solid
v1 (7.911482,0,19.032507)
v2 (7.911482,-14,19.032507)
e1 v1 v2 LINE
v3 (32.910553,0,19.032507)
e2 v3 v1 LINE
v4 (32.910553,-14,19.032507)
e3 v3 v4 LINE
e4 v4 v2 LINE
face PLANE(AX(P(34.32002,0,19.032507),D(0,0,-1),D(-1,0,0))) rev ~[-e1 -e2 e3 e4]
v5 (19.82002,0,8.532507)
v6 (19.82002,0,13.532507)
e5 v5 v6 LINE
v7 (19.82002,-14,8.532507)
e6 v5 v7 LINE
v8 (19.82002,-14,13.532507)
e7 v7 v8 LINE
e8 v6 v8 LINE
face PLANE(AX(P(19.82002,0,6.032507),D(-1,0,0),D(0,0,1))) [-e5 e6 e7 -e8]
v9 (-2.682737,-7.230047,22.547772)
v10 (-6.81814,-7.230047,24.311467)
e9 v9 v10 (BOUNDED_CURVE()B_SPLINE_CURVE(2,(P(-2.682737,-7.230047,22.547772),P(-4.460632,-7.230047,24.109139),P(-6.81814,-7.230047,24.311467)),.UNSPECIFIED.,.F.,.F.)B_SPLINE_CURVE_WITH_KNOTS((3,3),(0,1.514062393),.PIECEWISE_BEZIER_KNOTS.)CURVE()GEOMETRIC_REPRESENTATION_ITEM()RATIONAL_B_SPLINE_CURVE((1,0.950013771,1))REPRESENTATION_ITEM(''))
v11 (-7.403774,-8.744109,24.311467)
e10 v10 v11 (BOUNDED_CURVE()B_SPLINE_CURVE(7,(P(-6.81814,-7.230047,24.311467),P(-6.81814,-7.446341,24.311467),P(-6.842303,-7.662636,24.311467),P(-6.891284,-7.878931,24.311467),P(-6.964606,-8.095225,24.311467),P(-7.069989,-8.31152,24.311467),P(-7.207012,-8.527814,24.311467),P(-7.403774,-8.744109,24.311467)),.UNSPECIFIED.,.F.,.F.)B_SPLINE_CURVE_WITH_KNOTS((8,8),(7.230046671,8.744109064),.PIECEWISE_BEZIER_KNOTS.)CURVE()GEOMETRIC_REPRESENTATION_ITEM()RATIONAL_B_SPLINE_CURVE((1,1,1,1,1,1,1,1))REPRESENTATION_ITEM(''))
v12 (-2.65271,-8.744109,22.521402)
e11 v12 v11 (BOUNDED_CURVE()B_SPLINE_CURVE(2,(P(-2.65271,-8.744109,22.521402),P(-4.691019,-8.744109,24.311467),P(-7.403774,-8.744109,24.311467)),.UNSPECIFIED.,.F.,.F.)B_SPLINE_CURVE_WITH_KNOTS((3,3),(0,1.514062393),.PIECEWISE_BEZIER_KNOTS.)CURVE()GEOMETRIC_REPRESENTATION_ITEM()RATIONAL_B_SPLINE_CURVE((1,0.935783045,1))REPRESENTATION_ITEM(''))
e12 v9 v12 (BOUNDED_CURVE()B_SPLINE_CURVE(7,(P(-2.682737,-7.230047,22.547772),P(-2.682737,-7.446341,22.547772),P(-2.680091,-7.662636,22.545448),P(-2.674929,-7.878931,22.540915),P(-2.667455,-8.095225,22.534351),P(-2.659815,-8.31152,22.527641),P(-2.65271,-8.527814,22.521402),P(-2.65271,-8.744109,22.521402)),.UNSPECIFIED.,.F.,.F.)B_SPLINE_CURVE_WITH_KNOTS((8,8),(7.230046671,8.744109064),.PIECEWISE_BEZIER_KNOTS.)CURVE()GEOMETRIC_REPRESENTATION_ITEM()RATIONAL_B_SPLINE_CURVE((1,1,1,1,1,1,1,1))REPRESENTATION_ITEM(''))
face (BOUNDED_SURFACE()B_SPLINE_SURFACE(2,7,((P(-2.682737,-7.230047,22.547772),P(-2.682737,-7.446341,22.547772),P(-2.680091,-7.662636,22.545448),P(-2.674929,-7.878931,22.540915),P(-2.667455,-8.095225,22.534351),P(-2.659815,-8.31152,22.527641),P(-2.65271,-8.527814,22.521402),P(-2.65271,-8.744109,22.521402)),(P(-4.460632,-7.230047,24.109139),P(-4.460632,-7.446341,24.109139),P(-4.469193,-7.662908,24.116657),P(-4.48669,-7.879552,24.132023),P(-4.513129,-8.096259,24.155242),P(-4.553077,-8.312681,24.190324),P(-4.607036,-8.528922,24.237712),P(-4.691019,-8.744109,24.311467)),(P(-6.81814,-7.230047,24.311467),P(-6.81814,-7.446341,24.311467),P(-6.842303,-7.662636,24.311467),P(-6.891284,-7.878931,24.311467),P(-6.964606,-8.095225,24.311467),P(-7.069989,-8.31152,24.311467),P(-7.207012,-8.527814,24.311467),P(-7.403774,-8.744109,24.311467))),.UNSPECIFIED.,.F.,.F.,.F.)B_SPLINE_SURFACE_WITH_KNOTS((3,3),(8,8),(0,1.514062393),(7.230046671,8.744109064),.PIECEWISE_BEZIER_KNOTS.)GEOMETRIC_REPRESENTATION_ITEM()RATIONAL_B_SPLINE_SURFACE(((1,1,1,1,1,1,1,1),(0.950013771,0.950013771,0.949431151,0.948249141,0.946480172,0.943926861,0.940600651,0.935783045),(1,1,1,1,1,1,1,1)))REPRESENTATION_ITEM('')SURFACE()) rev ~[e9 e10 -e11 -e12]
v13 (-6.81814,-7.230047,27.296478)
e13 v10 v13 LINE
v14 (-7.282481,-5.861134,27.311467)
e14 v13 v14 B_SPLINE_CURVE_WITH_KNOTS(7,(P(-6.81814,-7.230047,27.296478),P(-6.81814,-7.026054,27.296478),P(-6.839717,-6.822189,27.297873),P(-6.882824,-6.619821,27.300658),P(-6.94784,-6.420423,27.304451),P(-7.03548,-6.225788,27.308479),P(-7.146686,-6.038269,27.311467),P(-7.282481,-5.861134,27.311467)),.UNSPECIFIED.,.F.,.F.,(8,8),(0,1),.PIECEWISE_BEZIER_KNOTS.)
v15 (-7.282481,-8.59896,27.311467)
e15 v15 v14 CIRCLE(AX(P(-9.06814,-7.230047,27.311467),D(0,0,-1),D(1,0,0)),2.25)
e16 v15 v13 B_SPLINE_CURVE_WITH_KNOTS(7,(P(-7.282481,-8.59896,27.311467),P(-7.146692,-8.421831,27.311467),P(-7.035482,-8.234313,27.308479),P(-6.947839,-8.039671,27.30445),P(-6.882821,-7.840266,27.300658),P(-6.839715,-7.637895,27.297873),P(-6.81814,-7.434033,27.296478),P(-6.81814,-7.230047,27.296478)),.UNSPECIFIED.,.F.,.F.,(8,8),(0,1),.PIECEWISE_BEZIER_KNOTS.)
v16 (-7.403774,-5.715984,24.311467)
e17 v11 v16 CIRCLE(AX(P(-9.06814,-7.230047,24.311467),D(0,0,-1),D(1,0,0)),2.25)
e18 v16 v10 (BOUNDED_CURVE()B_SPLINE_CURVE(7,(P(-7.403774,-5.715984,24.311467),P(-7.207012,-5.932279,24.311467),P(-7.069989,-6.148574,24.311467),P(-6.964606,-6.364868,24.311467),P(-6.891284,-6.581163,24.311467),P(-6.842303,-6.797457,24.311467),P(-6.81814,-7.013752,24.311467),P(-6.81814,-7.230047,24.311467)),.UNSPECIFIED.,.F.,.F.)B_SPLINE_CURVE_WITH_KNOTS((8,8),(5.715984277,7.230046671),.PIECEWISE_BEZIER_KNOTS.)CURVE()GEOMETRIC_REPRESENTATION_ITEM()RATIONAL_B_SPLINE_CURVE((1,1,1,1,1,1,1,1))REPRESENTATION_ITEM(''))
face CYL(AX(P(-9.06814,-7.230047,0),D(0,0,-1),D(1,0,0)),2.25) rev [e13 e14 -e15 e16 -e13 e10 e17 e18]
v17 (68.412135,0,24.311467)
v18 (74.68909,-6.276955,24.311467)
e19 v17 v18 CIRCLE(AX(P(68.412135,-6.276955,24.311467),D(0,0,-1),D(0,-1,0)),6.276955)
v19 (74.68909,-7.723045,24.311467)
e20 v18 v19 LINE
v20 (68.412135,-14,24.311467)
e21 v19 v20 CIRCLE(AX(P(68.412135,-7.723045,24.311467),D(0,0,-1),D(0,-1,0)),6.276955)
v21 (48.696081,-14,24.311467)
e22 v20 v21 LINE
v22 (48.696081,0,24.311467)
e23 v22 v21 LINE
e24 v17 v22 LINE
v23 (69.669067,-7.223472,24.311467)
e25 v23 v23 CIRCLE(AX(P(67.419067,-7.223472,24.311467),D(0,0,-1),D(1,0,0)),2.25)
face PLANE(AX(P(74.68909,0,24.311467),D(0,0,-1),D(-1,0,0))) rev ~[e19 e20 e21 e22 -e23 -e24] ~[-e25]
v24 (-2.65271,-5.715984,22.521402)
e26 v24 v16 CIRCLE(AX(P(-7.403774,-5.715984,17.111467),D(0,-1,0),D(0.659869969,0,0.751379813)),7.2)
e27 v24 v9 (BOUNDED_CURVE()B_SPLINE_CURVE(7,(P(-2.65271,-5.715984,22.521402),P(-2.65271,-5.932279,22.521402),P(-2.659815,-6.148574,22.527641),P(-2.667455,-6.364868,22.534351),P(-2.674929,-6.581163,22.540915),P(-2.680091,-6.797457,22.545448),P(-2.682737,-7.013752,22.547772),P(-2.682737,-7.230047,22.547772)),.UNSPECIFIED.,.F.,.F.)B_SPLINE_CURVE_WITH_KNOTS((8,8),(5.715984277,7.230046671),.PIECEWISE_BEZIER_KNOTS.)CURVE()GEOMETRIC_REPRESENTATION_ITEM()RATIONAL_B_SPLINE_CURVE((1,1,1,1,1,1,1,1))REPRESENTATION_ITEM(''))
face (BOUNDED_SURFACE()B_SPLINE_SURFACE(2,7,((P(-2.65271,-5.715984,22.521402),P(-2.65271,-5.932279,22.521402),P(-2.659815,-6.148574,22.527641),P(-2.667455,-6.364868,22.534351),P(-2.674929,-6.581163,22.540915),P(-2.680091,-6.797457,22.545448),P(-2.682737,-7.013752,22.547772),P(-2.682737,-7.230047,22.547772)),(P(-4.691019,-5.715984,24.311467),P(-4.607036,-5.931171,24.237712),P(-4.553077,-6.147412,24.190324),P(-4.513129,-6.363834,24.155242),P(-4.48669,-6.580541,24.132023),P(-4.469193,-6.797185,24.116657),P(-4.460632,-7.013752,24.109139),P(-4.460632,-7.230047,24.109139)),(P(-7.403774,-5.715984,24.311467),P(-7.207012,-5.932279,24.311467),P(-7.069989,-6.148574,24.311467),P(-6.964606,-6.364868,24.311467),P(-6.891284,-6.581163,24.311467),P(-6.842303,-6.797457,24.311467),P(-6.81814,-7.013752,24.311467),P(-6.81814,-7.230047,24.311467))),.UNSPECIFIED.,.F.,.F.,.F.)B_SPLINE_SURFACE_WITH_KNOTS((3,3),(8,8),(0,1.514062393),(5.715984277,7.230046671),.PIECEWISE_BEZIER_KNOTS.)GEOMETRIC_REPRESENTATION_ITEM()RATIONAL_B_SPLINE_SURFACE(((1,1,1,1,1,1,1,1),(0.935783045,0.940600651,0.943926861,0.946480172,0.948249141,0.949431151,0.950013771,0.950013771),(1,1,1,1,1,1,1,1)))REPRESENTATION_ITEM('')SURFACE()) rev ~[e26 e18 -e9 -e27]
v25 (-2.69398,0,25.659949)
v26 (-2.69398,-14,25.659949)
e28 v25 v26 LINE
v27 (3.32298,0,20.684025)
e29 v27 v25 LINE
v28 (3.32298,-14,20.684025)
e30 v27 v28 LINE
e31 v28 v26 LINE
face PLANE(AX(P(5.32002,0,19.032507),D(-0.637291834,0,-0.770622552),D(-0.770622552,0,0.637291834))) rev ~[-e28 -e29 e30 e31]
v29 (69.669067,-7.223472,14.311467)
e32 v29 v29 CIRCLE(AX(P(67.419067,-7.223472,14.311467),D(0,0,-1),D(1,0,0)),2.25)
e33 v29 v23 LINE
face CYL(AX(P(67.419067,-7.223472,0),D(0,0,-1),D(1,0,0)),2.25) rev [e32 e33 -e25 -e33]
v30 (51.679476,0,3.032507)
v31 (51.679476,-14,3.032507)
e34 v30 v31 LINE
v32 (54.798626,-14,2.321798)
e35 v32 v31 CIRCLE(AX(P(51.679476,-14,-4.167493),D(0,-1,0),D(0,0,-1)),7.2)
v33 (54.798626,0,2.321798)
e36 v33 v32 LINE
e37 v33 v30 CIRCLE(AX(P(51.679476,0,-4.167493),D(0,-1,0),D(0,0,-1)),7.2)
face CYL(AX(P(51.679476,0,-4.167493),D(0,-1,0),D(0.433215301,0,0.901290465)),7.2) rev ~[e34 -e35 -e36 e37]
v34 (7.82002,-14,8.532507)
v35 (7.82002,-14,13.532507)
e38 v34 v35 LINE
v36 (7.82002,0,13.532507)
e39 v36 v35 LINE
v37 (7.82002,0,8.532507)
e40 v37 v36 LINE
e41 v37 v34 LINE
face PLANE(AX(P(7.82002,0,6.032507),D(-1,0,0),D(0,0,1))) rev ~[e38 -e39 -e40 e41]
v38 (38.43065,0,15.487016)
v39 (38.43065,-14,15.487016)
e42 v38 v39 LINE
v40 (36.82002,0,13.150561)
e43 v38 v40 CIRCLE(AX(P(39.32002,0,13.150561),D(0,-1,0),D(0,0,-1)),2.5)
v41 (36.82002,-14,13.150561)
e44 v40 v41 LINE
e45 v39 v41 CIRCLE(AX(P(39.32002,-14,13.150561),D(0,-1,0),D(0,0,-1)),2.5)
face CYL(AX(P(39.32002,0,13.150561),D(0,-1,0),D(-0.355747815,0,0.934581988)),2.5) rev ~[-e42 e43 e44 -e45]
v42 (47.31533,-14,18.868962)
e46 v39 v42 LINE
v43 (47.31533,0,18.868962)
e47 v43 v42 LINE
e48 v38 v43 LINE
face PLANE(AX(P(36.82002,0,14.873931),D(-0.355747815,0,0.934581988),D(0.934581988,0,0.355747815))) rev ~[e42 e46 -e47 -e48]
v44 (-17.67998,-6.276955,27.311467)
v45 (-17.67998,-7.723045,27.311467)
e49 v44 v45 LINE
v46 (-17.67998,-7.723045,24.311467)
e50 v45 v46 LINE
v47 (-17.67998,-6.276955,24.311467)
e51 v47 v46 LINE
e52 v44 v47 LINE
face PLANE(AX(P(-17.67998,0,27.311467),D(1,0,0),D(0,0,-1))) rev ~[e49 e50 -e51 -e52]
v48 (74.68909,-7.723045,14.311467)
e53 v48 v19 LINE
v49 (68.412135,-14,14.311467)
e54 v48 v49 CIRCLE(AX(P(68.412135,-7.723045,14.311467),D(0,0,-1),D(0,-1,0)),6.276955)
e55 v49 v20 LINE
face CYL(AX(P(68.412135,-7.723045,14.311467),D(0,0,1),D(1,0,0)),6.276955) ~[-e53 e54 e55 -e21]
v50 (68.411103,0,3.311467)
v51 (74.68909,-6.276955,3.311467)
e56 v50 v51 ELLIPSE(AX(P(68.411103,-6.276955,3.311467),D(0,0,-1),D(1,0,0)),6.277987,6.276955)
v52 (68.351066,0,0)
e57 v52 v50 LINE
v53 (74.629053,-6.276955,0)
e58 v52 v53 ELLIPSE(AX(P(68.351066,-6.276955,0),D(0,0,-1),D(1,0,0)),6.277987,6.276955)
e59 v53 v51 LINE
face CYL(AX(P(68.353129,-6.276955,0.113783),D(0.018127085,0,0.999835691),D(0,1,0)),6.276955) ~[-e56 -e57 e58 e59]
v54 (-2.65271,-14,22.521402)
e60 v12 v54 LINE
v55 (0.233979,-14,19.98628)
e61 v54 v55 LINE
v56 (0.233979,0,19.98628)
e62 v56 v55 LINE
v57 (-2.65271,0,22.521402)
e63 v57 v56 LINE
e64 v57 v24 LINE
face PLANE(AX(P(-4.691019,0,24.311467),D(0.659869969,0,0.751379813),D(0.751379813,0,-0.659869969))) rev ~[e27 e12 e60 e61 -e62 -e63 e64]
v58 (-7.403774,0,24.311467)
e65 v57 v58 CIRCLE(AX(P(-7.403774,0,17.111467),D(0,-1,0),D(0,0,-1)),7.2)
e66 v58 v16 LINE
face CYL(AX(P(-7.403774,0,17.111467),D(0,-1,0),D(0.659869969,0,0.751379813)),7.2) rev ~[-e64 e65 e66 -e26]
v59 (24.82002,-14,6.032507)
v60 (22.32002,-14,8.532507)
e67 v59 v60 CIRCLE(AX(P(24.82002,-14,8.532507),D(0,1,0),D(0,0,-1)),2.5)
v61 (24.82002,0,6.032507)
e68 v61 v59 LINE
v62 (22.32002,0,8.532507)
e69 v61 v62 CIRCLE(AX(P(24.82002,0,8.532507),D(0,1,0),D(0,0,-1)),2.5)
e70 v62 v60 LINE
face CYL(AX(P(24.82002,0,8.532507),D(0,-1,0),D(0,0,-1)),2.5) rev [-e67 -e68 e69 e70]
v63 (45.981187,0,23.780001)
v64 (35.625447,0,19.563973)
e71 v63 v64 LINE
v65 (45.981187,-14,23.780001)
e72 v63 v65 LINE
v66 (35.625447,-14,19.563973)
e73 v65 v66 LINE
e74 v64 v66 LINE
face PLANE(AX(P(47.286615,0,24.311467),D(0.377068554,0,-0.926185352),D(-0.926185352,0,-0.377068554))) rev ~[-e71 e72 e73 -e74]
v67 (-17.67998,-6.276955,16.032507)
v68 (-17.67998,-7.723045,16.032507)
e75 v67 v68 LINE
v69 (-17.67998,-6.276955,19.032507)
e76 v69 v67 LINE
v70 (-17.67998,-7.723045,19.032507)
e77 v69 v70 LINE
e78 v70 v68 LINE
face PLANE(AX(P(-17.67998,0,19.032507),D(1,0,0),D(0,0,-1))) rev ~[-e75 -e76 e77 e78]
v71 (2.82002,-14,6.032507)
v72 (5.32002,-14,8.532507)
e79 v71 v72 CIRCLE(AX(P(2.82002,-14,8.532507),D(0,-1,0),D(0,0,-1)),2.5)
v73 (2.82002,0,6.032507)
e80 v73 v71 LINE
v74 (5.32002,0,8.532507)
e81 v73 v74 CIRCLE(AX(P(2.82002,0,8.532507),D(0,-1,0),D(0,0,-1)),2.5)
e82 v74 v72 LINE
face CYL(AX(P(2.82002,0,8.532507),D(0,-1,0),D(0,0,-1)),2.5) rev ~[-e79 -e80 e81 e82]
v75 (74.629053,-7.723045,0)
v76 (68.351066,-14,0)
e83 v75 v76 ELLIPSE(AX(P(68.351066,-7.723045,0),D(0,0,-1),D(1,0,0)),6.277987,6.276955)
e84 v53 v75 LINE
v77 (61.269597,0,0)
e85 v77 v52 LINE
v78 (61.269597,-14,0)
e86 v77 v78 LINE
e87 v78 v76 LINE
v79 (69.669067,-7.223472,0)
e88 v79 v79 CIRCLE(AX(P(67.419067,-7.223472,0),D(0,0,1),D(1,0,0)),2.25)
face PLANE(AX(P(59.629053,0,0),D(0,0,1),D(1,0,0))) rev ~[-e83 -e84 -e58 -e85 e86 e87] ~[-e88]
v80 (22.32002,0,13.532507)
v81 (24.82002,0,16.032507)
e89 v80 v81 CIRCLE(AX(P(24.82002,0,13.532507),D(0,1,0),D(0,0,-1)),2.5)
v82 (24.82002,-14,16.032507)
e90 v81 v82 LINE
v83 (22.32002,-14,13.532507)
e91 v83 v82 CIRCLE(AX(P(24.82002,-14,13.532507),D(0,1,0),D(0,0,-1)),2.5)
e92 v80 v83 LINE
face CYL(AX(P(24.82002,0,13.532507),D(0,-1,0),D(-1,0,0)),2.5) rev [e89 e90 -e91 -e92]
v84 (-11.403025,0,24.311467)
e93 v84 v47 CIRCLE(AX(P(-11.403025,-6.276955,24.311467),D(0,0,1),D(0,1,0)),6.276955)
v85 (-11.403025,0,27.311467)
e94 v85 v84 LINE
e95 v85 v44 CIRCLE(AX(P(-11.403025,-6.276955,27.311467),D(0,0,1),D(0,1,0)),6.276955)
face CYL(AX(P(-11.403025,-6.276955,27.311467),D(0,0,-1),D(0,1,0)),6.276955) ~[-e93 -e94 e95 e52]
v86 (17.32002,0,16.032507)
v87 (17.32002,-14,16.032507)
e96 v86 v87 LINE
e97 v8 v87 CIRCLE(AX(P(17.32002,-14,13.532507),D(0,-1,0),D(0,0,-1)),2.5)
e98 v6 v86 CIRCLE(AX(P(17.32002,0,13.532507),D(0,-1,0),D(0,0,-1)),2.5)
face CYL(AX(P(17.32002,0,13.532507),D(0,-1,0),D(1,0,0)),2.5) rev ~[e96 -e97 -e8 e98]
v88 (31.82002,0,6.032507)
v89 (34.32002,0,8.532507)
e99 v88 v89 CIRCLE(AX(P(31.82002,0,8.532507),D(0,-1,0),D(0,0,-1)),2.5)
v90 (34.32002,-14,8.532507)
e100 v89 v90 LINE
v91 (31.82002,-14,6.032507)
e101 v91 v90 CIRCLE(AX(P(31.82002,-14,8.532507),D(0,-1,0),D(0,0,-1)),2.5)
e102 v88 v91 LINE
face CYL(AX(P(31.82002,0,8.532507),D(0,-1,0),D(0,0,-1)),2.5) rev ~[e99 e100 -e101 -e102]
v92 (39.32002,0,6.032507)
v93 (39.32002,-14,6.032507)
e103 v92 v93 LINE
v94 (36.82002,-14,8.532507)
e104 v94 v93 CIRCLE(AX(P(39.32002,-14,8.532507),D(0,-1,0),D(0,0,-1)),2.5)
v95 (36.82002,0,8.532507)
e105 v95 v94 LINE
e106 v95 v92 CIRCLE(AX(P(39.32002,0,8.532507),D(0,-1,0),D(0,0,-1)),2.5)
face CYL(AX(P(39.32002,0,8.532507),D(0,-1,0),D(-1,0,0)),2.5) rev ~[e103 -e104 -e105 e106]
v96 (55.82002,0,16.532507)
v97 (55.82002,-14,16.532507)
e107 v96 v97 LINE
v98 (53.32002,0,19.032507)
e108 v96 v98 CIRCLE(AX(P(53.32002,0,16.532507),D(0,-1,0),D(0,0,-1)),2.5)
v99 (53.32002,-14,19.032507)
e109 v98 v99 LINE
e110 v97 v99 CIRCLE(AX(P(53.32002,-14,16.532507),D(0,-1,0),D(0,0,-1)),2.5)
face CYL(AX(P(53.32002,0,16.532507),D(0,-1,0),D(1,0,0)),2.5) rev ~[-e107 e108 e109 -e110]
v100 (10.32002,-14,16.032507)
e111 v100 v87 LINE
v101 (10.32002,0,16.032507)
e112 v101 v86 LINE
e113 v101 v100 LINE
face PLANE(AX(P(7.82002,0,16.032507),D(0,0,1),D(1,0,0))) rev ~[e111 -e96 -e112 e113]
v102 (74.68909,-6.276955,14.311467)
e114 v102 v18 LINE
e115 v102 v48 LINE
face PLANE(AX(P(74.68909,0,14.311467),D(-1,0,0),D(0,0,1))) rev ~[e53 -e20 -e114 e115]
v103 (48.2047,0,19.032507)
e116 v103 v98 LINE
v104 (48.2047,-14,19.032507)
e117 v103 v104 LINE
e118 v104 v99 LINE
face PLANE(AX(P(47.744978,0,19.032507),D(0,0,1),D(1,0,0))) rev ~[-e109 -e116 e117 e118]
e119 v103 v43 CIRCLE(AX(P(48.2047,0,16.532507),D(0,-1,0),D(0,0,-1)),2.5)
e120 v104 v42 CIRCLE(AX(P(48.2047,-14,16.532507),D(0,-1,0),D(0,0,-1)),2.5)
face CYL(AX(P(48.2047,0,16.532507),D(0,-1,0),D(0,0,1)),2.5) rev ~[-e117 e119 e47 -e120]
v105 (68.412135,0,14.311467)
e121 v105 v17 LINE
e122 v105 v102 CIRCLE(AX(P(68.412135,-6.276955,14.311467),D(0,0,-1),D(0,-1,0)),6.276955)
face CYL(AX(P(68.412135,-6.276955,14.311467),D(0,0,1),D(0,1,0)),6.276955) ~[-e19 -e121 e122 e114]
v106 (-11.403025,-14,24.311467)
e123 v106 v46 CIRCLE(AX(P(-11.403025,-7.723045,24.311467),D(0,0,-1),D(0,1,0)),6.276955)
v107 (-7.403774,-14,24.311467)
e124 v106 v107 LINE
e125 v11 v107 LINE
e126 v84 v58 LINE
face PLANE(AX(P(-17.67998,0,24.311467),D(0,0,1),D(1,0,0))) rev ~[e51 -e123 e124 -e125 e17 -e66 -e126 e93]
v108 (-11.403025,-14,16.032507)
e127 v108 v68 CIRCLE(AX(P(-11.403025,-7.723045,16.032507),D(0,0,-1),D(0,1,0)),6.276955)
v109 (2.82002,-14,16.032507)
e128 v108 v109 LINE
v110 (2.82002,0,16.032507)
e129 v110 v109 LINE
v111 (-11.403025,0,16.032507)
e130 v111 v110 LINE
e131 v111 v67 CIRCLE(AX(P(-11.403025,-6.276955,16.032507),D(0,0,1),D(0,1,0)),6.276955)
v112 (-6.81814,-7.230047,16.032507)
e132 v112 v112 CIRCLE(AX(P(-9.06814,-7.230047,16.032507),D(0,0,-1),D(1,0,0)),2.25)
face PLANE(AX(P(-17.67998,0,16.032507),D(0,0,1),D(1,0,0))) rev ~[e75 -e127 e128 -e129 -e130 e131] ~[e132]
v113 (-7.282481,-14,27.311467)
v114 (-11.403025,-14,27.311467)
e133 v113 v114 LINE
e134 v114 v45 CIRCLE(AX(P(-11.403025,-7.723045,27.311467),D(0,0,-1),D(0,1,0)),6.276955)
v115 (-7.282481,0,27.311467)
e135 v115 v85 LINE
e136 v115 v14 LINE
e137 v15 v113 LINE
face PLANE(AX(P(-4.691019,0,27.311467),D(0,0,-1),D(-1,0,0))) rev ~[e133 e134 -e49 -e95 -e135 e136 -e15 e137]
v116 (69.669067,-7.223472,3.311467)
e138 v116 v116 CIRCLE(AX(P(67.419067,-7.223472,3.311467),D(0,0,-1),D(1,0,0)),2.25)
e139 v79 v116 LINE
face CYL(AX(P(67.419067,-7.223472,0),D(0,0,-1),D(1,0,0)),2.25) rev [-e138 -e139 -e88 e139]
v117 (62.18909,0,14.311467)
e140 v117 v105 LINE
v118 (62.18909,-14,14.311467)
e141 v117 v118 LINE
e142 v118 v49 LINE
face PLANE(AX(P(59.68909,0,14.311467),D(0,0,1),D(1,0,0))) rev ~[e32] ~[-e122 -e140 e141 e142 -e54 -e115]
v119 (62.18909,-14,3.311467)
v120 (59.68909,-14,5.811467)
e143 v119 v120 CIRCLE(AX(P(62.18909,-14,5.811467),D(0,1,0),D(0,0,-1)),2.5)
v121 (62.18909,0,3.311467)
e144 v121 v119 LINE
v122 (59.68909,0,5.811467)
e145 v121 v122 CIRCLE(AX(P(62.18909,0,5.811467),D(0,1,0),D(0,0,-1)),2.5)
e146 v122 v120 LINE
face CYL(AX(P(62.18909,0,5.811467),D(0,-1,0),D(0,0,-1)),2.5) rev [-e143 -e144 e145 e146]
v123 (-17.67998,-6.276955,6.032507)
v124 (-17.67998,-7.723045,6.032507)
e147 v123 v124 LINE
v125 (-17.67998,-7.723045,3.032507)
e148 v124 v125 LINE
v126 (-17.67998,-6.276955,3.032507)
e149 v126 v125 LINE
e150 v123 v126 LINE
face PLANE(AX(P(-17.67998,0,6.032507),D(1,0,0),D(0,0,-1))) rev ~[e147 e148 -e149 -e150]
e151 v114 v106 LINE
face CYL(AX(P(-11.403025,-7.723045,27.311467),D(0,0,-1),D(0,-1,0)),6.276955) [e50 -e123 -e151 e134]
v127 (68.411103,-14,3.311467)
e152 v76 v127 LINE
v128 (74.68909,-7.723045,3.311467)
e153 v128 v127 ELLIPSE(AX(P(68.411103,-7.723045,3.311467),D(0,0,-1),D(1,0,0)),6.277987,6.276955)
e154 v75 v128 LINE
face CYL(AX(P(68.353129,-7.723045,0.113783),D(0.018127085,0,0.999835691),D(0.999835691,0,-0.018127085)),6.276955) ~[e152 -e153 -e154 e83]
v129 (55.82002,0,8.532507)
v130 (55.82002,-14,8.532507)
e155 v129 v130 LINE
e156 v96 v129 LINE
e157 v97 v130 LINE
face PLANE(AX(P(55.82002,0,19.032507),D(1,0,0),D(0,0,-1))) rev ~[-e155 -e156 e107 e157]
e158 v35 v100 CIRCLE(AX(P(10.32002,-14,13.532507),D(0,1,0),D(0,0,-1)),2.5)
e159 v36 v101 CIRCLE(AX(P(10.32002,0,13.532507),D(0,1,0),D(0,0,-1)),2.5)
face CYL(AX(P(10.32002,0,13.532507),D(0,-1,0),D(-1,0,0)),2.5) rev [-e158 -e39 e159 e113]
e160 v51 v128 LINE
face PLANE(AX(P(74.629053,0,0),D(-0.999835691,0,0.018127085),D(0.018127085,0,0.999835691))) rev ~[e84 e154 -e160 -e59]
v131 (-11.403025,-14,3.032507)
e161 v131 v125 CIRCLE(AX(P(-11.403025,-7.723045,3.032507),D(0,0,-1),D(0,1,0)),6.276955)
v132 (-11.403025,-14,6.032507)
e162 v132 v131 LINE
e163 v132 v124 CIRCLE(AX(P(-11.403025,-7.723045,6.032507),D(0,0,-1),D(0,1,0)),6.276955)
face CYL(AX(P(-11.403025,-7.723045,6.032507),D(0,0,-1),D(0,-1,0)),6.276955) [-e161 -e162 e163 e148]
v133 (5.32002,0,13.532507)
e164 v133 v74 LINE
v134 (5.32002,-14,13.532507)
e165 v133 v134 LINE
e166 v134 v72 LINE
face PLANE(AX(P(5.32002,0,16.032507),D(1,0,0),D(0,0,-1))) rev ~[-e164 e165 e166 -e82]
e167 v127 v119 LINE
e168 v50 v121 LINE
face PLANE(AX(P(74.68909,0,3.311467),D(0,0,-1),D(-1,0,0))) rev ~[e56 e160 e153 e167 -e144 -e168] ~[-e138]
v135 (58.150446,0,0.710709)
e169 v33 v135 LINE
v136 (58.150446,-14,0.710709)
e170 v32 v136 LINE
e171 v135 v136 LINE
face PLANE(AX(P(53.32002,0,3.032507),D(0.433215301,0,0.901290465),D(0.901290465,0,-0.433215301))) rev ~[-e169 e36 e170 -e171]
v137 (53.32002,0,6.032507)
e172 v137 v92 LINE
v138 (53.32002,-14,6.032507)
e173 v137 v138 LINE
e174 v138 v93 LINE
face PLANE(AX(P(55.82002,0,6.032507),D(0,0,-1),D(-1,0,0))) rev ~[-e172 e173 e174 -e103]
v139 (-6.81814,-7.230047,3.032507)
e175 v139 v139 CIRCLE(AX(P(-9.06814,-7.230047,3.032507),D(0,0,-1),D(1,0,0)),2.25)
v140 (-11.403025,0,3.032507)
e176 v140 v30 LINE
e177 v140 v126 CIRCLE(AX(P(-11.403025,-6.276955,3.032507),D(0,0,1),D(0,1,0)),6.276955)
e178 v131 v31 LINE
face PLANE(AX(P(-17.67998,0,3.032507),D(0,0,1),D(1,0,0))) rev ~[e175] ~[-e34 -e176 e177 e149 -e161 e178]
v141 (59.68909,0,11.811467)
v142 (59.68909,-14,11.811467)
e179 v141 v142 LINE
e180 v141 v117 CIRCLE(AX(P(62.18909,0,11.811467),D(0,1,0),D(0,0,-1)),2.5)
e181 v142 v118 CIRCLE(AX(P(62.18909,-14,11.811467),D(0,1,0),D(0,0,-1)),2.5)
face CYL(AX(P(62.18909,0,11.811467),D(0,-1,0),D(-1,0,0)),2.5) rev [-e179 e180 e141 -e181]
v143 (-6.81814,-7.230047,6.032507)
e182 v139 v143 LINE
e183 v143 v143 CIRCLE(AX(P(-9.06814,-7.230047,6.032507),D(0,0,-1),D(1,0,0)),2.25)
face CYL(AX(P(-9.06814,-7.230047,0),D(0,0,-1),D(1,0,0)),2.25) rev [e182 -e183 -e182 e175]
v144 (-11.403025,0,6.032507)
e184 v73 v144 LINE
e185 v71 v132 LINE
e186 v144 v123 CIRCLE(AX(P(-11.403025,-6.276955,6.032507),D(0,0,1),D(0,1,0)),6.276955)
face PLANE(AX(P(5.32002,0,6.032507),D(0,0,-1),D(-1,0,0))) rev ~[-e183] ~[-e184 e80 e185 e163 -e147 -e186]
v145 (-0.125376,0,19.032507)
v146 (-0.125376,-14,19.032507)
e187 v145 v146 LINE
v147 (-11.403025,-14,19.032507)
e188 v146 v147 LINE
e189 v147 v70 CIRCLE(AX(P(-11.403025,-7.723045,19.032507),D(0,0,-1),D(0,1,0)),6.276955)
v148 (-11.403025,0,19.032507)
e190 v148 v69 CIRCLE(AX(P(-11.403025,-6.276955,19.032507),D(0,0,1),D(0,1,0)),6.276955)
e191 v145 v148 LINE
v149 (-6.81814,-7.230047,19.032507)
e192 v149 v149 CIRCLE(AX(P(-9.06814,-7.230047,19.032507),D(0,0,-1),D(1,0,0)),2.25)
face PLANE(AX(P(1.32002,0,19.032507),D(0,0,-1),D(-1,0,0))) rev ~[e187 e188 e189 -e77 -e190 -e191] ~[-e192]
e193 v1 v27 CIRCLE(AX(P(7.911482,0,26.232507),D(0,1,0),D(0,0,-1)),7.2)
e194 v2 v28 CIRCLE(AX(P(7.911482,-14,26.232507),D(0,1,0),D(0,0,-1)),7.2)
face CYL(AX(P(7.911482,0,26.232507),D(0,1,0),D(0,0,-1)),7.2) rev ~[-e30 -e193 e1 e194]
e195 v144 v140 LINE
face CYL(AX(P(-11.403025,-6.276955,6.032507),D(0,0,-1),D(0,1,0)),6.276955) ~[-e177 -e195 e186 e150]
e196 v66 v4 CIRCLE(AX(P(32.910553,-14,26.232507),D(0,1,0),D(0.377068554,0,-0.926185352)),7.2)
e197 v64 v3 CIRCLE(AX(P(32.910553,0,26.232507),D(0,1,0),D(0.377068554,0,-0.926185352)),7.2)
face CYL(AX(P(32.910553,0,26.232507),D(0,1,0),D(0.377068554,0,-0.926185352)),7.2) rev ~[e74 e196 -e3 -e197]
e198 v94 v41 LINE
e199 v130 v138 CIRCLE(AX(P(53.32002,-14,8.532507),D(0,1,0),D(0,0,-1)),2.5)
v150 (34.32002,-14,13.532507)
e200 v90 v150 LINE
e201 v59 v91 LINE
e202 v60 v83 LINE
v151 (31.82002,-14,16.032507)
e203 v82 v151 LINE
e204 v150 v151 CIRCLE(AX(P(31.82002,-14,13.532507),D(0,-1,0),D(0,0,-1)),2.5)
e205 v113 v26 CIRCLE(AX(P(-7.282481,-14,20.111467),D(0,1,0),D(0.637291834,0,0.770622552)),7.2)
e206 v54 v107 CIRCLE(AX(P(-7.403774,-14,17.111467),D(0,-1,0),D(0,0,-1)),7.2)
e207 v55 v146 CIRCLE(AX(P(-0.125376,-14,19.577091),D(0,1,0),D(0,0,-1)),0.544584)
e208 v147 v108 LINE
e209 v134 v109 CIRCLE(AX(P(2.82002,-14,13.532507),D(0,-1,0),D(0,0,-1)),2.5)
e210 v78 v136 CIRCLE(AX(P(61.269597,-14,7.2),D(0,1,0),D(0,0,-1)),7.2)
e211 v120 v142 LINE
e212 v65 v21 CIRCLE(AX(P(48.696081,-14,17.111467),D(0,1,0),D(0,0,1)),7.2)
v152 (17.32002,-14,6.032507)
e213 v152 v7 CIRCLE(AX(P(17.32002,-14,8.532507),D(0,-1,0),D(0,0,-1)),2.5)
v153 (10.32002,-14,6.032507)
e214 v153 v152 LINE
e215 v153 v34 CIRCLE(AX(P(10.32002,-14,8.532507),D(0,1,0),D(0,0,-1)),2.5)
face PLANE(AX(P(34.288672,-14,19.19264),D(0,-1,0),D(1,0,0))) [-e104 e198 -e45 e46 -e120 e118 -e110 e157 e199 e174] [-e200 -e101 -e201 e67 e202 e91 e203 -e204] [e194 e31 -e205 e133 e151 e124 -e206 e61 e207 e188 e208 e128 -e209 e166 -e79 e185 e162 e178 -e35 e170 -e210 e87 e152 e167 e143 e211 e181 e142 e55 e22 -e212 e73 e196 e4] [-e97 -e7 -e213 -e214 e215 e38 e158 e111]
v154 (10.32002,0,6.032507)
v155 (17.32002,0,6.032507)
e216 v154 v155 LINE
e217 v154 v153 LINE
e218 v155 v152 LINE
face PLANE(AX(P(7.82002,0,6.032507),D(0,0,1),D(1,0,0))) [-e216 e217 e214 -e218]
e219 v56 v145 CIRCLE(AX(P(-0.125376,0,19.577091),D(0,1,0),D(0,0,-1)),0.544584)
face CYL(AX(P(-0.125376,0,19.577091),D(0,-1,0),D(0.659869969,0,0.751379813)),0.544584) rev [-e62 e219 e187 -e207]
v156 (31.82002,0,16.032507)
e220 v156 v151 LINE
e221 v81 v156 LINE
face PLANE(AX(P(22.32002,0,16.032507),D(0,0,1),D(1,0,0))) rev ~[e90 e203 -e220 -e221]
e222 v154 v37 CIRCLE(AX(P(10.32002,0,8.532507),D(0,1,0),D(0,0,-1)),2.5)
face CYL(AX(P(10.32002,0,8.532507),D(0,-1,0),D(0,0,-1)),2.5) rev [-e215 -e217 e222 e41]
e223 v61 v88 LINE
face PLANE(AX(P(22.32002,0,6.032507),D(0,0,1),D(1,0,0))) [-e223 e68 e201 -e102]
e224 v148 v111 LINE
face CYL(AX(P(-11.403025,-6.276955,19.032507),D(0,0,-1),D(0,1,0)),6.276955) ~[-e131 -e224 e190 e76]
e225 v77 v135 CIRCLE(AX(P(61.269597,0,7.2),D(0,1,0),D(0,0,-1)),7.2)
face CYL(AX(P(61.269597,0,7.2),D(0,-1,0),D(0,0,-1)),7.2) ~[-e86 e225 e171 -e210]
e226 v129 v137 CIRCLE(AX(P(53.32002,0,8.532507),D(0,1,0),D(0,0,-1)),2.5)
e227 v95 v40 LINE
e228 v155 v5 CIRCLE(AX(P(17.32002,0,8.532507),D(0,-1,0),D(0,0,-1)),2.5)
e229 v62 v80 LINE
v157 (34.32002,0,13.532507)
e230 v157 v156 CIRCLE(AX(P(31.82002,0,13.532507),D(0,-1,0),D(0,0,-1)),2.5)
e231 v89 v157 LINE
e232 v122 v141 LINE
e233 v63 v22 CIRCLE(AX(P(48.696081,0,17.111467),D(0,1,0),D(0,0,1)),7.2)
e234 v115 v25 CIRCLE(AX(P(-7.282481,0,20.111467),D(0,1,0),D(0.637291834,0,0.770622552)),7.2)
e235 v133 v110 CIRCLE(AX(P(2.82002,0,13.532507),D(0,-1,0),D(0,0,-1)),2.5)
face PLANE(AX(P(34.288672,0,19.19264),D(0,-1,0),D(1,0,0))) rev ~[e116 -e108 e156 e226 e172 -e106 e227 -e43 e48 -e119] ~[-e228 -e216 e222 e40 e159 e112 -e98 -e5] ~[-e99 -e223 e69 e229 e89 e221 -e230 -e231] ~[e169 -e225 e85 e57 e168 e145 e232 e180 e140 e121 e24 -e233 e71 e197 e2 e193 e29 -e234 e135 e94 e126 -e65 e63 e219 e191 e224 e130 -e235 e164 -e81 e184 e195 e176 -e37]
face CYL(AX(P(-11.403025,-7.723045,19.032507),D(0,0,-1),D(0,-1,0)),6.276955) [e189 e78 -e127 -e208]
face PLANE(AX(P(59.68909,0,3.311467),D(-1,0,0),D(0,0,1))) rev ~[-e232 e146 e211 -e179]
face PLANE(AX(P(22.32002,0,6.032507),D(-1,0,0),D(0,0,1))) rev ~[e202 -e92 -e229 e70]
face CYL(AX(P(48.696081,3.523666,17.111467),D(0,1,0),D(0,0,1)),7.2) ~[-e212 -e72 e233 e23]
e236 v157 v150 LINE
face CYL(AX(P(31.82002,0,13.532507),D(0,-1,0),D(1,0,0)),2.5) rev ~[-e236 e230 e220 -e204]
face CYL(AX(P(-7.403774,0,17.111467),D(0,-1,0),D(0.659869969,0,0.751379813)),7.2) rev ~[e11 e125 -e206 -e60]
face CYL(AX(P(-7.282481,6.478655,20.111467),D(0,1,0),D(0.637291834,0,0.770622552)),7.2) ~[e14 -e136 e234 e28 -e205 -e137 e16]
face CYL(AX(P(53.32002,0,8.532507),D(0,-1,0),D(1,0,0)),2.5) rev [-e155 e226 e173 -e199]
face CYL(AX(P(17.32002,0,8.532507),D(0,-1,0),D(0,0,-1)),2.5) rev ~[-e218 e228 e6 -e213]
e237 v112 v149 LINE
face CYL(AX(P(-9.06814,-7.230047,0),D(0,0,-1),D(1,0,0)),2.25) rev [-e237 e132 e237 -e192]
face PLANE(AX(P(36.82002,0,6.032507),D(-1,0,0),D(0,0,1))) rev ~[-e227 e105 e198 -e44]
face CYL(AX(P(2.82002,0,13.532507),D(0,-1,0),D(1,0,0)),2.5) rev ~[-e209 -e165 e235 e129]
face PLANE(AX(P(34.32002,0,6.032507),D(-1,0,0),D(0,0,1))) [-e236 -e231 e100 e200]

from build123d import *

# Parameters (mm, degrees)
F0_W         = 12
F0_H         = 10
F1_DEPTH     = 14
F2_R         = 2.25
F3_DEPTH     = 99.1
F4_DEPTH     = 25
F5_R         = 6.2769552622
F6_R         = 6.2769552622
F7_R         = 2.5
F8_R         = 2.5
F9_R         = 2.5
F10_R        = 2.5
F11_T1_DEPTH = 14
F11_T3_DEPTH = 21.0473321416
F11_T5_DEPTH = 26.9573104187
F12_R        = 7.2
F13_R        = 7.2
F14_R        = 0.5445837107


# Not quite as in the source:
# - a fillet or chamfer that OpenCascade refuses, or shapes differently, is made with other operations: its cross-section is extruded or revolved along the edge and cut away or added


with BuildPart() as f1:
    # F0 (on Front) → F1 (new body)
    with BuildSketch(Plane.XZ):
        Polygon((59.6290528774, 0), (74.6290528774, 0), (74.6890899837, 3.3114668612), (59.6890899837, 3.3114668612), (59.6890899837, 14.3114668612), (74.6890899837, 14.3114668612), (74.6890899837, 24.3114668612), (47.2866145434, 24.3114668612), (34.3200196198, 19.0325071069), (5.3200196198, 19.0325071069), (-4.6910188856, 27.3114668612), (-17.6799803802, 27.3114668612), (-17.6799803802, 24.3114668612), (-4.6910188856, 24.3114668612), (1.3200196198, 19.0325071069), (-17.6799803802, 19.0325071069), (-17.6799803802, 16.0325071069), (5.3200196198, 16.0325071069), (5.3200196198, 6.0325071069), (-17.6799803802, 6.0325071069), (-17.6799803802, 3.0325071069), (53.3200196198, 3.0325071069), align=None)
        with Locations((13.8200196198, 11.0325071069)):
            Rectangle(F0_W, F0_H, mode=Mode.SUBTRACT)
        with Locations((28.3200196198, 11.0325071069)):
            Rectangle(F0_W, F0_H, mode=Mode.SUBTRACT)
        Polygon((55.8200196198, 6.0325071069), (36.8200196198, 6.0325071069), (36.8200196198, 14.8739311844), (47.7449782193, 19.0325071069), (55.8200196198, 19.0325071069), align=None, mode=Mode.SUBTRACT)
    extrude(amount=F1_DEPTH)

    # F2 (on Top) → F3 (cut)
    with BuildSketch(Plane.XY):
        with Locations((-9.0681398287, -7.2300466709)):
            Circle(F2_R)
        with Locations((67.4190670252, -7.2234715335)):
            Circle(F2_R)
    extrude(amount=F3_DEPTH, mode=Mode.SUBTRACT)

    # F2 (on Top) → F4 (cut)
    with BuildSketch(Plane.XY):
        with Locations((-9.0681398287, -7.2300466709)):
            Circle(F2_R)
        with Locations((67.4190670252, -7.2234715335)):
            Circle(F2_R)
    extrude(amount=-F4_DEPTH, mode=Mode.SUBTRACT)

    # F5
    f5_edges = [f1.edges().sort_by_distance(p)[0] for p in [
        (-17.67998, -14, 25.811467),
        (-17.67998, 0, 25.811467),
        (-17.67998, -14, 17.532507),
        (-17.67998, 0, 17.532507),
        (-17.67998, 0, 4.532507),
        (-17.67998, -14, 4.532507),
    ]]
    fillet(f5_edges, radius=F5_R)

    # F6
    f6_edges = [f1.edges().sort_by_distance(p)[0] for p in [
        (74.68909, -14, 19.311467),
        (74.68909, 0, 19.311467),
        (74.659071, -14, 1.655733),
        (74.659071, 0, 1.655733),
    ]]
    fillet(f6_edges, radius=F6_R)

    # F7
    f7_edges = [f1.edges().sort_by_distance(p)[0] for p in [
        (36.82002, -7, 6.032507),
        (36.82002, -7, 14.873931),
        (47.744978, -7, 19.032507),
        (55.82002, -7, 19.032507),
        (55.82002, -7, 6.032507),
    ]]
    fillet(f7_edges, radius=F7_R)

    # F8
    f8_edges = [f1.edges().sort_by_distance(p)[0] for p in [
        (34.32002, -7, 16.032507),
        (22.32002, -7, 16.032507),
        (22.32002, -7, 6.032507),
        (34.32002, -7, 6.032507),
    ]]
    fillet(f8_edges, radius=F8_R)

    # F9
    f9_edges = [f1.edges().sort_by_distance(p)[0] for p in [
        (19.82002, -7, 16.032507),
        (7.82002, -7, 16.032507),
        (7.82002, -7, 6.032507),
        (19.82002, -7, 6.032507),
    ]]
    fillet(f9_edges, radius=F9_R)

    # F10
    f10_edges = [f1.edges().sort_by_distance(p)[0] for p in [
        (5.32002, -7, 16.032507),
        (5.32002, -7, 6.032507),
        (59.68909, -7, 14.311467),
        (59.68909, -7, 3.311467),
    ]]
    fillet(f10_edges, radius=F10_R)

    # F11: fillet of radius 7.2 on 4 edges, made by hand

    # F11_s2 → F11_t1 (join)
    with BuildSketch(Plane.XZ):
        with BuildLine():
            ThreePointArc((35.6254467793, 19.5639725748), (34.2937652809, 19.1666225681), (32.9105531914, 19.0325071069))
            Line((32.9105531914, 19.0325071069), (34.3200196198, 19.0325071069))
            Line((34.3200196198, 19.0325071069), (35.6254467793, 19.5639725748))
        make_face()
        with BuildLine():
            ThreePointArc((7.9114817035, 19.0325071069), (5.4731495991, 19.457956454), (3.3229804953, 20.6840247322))
            Line((3.3229804953, 20.6840247322), (5.3200196198, 19.0325071069))
            Line((5.3200196198, 19.0325071069), (7.9114817035, 19.0325071069))
        make_face()
    extrude(amount=F11_T1_DEPTH)

    # F11_s4 → F11_t3 (cut)
    with BuildSketch(Plane.XZ.offset(-3.5236660708)):
        with BuildLine():
            ThreePointArc((48.6960809717, 24.3114668612), (47.3128688823, 24.1773514), (45.9811873838, 23.7800013933))
            Line((45.9811873838, 23.7800013933), (47.2866145434, 24.3114668612))
            Line((47.2866145434, 24.3114668612), (48.6960809717, 24.3114668612))
        make_face()
    extrude(amount=F11_T3_DEPTH, mode=Mode.SUBTRACT)

    # F11_s6 → F11_t5 (cut)
    with BuildSketch(Plane.XZ.offset(-6.4786552093)):
        with BuildLine():
            ThreePointArc((-2.6939797611, 25.6599492359), (-4.844148865, 26.8860175141), (-7.2824809693, 27.3114668612))
            Line((-7.2824809693, 27.3114668612), (-4.6910188856, 27.3114668612))
            Line((-4.6910188856, 27.3114668612), (-2.6939797611, 25.6599492359))
        make_face()
    extrude(amount=F11_T5_DEPTH, mode=Mode.SUBTRACT)

    # F12
    f12_edges = [f1.edges().sort_by_distance(p)[0] for p in [
        (53.32002, -7, 3.032507),
        (59.629053, -7, 0),
    ]]
    fillet(f12_edges, radius=F12_R)

    # F13
    f13_edges = [f1.edges().sort_by_distance(p)[0] for p in [
        (-4.691019, -7, 24.311467),
    ]]
    fillet(f13_edges, radius=F13_R)

    # F14
    f14_edges = [f1.edges().sort_by_distance(p)[0] for p in [
        (1.32002, -7, 19.032507),
    ]]
    fillet(f14_edges, radius=F14_R)


solid = f1.part
